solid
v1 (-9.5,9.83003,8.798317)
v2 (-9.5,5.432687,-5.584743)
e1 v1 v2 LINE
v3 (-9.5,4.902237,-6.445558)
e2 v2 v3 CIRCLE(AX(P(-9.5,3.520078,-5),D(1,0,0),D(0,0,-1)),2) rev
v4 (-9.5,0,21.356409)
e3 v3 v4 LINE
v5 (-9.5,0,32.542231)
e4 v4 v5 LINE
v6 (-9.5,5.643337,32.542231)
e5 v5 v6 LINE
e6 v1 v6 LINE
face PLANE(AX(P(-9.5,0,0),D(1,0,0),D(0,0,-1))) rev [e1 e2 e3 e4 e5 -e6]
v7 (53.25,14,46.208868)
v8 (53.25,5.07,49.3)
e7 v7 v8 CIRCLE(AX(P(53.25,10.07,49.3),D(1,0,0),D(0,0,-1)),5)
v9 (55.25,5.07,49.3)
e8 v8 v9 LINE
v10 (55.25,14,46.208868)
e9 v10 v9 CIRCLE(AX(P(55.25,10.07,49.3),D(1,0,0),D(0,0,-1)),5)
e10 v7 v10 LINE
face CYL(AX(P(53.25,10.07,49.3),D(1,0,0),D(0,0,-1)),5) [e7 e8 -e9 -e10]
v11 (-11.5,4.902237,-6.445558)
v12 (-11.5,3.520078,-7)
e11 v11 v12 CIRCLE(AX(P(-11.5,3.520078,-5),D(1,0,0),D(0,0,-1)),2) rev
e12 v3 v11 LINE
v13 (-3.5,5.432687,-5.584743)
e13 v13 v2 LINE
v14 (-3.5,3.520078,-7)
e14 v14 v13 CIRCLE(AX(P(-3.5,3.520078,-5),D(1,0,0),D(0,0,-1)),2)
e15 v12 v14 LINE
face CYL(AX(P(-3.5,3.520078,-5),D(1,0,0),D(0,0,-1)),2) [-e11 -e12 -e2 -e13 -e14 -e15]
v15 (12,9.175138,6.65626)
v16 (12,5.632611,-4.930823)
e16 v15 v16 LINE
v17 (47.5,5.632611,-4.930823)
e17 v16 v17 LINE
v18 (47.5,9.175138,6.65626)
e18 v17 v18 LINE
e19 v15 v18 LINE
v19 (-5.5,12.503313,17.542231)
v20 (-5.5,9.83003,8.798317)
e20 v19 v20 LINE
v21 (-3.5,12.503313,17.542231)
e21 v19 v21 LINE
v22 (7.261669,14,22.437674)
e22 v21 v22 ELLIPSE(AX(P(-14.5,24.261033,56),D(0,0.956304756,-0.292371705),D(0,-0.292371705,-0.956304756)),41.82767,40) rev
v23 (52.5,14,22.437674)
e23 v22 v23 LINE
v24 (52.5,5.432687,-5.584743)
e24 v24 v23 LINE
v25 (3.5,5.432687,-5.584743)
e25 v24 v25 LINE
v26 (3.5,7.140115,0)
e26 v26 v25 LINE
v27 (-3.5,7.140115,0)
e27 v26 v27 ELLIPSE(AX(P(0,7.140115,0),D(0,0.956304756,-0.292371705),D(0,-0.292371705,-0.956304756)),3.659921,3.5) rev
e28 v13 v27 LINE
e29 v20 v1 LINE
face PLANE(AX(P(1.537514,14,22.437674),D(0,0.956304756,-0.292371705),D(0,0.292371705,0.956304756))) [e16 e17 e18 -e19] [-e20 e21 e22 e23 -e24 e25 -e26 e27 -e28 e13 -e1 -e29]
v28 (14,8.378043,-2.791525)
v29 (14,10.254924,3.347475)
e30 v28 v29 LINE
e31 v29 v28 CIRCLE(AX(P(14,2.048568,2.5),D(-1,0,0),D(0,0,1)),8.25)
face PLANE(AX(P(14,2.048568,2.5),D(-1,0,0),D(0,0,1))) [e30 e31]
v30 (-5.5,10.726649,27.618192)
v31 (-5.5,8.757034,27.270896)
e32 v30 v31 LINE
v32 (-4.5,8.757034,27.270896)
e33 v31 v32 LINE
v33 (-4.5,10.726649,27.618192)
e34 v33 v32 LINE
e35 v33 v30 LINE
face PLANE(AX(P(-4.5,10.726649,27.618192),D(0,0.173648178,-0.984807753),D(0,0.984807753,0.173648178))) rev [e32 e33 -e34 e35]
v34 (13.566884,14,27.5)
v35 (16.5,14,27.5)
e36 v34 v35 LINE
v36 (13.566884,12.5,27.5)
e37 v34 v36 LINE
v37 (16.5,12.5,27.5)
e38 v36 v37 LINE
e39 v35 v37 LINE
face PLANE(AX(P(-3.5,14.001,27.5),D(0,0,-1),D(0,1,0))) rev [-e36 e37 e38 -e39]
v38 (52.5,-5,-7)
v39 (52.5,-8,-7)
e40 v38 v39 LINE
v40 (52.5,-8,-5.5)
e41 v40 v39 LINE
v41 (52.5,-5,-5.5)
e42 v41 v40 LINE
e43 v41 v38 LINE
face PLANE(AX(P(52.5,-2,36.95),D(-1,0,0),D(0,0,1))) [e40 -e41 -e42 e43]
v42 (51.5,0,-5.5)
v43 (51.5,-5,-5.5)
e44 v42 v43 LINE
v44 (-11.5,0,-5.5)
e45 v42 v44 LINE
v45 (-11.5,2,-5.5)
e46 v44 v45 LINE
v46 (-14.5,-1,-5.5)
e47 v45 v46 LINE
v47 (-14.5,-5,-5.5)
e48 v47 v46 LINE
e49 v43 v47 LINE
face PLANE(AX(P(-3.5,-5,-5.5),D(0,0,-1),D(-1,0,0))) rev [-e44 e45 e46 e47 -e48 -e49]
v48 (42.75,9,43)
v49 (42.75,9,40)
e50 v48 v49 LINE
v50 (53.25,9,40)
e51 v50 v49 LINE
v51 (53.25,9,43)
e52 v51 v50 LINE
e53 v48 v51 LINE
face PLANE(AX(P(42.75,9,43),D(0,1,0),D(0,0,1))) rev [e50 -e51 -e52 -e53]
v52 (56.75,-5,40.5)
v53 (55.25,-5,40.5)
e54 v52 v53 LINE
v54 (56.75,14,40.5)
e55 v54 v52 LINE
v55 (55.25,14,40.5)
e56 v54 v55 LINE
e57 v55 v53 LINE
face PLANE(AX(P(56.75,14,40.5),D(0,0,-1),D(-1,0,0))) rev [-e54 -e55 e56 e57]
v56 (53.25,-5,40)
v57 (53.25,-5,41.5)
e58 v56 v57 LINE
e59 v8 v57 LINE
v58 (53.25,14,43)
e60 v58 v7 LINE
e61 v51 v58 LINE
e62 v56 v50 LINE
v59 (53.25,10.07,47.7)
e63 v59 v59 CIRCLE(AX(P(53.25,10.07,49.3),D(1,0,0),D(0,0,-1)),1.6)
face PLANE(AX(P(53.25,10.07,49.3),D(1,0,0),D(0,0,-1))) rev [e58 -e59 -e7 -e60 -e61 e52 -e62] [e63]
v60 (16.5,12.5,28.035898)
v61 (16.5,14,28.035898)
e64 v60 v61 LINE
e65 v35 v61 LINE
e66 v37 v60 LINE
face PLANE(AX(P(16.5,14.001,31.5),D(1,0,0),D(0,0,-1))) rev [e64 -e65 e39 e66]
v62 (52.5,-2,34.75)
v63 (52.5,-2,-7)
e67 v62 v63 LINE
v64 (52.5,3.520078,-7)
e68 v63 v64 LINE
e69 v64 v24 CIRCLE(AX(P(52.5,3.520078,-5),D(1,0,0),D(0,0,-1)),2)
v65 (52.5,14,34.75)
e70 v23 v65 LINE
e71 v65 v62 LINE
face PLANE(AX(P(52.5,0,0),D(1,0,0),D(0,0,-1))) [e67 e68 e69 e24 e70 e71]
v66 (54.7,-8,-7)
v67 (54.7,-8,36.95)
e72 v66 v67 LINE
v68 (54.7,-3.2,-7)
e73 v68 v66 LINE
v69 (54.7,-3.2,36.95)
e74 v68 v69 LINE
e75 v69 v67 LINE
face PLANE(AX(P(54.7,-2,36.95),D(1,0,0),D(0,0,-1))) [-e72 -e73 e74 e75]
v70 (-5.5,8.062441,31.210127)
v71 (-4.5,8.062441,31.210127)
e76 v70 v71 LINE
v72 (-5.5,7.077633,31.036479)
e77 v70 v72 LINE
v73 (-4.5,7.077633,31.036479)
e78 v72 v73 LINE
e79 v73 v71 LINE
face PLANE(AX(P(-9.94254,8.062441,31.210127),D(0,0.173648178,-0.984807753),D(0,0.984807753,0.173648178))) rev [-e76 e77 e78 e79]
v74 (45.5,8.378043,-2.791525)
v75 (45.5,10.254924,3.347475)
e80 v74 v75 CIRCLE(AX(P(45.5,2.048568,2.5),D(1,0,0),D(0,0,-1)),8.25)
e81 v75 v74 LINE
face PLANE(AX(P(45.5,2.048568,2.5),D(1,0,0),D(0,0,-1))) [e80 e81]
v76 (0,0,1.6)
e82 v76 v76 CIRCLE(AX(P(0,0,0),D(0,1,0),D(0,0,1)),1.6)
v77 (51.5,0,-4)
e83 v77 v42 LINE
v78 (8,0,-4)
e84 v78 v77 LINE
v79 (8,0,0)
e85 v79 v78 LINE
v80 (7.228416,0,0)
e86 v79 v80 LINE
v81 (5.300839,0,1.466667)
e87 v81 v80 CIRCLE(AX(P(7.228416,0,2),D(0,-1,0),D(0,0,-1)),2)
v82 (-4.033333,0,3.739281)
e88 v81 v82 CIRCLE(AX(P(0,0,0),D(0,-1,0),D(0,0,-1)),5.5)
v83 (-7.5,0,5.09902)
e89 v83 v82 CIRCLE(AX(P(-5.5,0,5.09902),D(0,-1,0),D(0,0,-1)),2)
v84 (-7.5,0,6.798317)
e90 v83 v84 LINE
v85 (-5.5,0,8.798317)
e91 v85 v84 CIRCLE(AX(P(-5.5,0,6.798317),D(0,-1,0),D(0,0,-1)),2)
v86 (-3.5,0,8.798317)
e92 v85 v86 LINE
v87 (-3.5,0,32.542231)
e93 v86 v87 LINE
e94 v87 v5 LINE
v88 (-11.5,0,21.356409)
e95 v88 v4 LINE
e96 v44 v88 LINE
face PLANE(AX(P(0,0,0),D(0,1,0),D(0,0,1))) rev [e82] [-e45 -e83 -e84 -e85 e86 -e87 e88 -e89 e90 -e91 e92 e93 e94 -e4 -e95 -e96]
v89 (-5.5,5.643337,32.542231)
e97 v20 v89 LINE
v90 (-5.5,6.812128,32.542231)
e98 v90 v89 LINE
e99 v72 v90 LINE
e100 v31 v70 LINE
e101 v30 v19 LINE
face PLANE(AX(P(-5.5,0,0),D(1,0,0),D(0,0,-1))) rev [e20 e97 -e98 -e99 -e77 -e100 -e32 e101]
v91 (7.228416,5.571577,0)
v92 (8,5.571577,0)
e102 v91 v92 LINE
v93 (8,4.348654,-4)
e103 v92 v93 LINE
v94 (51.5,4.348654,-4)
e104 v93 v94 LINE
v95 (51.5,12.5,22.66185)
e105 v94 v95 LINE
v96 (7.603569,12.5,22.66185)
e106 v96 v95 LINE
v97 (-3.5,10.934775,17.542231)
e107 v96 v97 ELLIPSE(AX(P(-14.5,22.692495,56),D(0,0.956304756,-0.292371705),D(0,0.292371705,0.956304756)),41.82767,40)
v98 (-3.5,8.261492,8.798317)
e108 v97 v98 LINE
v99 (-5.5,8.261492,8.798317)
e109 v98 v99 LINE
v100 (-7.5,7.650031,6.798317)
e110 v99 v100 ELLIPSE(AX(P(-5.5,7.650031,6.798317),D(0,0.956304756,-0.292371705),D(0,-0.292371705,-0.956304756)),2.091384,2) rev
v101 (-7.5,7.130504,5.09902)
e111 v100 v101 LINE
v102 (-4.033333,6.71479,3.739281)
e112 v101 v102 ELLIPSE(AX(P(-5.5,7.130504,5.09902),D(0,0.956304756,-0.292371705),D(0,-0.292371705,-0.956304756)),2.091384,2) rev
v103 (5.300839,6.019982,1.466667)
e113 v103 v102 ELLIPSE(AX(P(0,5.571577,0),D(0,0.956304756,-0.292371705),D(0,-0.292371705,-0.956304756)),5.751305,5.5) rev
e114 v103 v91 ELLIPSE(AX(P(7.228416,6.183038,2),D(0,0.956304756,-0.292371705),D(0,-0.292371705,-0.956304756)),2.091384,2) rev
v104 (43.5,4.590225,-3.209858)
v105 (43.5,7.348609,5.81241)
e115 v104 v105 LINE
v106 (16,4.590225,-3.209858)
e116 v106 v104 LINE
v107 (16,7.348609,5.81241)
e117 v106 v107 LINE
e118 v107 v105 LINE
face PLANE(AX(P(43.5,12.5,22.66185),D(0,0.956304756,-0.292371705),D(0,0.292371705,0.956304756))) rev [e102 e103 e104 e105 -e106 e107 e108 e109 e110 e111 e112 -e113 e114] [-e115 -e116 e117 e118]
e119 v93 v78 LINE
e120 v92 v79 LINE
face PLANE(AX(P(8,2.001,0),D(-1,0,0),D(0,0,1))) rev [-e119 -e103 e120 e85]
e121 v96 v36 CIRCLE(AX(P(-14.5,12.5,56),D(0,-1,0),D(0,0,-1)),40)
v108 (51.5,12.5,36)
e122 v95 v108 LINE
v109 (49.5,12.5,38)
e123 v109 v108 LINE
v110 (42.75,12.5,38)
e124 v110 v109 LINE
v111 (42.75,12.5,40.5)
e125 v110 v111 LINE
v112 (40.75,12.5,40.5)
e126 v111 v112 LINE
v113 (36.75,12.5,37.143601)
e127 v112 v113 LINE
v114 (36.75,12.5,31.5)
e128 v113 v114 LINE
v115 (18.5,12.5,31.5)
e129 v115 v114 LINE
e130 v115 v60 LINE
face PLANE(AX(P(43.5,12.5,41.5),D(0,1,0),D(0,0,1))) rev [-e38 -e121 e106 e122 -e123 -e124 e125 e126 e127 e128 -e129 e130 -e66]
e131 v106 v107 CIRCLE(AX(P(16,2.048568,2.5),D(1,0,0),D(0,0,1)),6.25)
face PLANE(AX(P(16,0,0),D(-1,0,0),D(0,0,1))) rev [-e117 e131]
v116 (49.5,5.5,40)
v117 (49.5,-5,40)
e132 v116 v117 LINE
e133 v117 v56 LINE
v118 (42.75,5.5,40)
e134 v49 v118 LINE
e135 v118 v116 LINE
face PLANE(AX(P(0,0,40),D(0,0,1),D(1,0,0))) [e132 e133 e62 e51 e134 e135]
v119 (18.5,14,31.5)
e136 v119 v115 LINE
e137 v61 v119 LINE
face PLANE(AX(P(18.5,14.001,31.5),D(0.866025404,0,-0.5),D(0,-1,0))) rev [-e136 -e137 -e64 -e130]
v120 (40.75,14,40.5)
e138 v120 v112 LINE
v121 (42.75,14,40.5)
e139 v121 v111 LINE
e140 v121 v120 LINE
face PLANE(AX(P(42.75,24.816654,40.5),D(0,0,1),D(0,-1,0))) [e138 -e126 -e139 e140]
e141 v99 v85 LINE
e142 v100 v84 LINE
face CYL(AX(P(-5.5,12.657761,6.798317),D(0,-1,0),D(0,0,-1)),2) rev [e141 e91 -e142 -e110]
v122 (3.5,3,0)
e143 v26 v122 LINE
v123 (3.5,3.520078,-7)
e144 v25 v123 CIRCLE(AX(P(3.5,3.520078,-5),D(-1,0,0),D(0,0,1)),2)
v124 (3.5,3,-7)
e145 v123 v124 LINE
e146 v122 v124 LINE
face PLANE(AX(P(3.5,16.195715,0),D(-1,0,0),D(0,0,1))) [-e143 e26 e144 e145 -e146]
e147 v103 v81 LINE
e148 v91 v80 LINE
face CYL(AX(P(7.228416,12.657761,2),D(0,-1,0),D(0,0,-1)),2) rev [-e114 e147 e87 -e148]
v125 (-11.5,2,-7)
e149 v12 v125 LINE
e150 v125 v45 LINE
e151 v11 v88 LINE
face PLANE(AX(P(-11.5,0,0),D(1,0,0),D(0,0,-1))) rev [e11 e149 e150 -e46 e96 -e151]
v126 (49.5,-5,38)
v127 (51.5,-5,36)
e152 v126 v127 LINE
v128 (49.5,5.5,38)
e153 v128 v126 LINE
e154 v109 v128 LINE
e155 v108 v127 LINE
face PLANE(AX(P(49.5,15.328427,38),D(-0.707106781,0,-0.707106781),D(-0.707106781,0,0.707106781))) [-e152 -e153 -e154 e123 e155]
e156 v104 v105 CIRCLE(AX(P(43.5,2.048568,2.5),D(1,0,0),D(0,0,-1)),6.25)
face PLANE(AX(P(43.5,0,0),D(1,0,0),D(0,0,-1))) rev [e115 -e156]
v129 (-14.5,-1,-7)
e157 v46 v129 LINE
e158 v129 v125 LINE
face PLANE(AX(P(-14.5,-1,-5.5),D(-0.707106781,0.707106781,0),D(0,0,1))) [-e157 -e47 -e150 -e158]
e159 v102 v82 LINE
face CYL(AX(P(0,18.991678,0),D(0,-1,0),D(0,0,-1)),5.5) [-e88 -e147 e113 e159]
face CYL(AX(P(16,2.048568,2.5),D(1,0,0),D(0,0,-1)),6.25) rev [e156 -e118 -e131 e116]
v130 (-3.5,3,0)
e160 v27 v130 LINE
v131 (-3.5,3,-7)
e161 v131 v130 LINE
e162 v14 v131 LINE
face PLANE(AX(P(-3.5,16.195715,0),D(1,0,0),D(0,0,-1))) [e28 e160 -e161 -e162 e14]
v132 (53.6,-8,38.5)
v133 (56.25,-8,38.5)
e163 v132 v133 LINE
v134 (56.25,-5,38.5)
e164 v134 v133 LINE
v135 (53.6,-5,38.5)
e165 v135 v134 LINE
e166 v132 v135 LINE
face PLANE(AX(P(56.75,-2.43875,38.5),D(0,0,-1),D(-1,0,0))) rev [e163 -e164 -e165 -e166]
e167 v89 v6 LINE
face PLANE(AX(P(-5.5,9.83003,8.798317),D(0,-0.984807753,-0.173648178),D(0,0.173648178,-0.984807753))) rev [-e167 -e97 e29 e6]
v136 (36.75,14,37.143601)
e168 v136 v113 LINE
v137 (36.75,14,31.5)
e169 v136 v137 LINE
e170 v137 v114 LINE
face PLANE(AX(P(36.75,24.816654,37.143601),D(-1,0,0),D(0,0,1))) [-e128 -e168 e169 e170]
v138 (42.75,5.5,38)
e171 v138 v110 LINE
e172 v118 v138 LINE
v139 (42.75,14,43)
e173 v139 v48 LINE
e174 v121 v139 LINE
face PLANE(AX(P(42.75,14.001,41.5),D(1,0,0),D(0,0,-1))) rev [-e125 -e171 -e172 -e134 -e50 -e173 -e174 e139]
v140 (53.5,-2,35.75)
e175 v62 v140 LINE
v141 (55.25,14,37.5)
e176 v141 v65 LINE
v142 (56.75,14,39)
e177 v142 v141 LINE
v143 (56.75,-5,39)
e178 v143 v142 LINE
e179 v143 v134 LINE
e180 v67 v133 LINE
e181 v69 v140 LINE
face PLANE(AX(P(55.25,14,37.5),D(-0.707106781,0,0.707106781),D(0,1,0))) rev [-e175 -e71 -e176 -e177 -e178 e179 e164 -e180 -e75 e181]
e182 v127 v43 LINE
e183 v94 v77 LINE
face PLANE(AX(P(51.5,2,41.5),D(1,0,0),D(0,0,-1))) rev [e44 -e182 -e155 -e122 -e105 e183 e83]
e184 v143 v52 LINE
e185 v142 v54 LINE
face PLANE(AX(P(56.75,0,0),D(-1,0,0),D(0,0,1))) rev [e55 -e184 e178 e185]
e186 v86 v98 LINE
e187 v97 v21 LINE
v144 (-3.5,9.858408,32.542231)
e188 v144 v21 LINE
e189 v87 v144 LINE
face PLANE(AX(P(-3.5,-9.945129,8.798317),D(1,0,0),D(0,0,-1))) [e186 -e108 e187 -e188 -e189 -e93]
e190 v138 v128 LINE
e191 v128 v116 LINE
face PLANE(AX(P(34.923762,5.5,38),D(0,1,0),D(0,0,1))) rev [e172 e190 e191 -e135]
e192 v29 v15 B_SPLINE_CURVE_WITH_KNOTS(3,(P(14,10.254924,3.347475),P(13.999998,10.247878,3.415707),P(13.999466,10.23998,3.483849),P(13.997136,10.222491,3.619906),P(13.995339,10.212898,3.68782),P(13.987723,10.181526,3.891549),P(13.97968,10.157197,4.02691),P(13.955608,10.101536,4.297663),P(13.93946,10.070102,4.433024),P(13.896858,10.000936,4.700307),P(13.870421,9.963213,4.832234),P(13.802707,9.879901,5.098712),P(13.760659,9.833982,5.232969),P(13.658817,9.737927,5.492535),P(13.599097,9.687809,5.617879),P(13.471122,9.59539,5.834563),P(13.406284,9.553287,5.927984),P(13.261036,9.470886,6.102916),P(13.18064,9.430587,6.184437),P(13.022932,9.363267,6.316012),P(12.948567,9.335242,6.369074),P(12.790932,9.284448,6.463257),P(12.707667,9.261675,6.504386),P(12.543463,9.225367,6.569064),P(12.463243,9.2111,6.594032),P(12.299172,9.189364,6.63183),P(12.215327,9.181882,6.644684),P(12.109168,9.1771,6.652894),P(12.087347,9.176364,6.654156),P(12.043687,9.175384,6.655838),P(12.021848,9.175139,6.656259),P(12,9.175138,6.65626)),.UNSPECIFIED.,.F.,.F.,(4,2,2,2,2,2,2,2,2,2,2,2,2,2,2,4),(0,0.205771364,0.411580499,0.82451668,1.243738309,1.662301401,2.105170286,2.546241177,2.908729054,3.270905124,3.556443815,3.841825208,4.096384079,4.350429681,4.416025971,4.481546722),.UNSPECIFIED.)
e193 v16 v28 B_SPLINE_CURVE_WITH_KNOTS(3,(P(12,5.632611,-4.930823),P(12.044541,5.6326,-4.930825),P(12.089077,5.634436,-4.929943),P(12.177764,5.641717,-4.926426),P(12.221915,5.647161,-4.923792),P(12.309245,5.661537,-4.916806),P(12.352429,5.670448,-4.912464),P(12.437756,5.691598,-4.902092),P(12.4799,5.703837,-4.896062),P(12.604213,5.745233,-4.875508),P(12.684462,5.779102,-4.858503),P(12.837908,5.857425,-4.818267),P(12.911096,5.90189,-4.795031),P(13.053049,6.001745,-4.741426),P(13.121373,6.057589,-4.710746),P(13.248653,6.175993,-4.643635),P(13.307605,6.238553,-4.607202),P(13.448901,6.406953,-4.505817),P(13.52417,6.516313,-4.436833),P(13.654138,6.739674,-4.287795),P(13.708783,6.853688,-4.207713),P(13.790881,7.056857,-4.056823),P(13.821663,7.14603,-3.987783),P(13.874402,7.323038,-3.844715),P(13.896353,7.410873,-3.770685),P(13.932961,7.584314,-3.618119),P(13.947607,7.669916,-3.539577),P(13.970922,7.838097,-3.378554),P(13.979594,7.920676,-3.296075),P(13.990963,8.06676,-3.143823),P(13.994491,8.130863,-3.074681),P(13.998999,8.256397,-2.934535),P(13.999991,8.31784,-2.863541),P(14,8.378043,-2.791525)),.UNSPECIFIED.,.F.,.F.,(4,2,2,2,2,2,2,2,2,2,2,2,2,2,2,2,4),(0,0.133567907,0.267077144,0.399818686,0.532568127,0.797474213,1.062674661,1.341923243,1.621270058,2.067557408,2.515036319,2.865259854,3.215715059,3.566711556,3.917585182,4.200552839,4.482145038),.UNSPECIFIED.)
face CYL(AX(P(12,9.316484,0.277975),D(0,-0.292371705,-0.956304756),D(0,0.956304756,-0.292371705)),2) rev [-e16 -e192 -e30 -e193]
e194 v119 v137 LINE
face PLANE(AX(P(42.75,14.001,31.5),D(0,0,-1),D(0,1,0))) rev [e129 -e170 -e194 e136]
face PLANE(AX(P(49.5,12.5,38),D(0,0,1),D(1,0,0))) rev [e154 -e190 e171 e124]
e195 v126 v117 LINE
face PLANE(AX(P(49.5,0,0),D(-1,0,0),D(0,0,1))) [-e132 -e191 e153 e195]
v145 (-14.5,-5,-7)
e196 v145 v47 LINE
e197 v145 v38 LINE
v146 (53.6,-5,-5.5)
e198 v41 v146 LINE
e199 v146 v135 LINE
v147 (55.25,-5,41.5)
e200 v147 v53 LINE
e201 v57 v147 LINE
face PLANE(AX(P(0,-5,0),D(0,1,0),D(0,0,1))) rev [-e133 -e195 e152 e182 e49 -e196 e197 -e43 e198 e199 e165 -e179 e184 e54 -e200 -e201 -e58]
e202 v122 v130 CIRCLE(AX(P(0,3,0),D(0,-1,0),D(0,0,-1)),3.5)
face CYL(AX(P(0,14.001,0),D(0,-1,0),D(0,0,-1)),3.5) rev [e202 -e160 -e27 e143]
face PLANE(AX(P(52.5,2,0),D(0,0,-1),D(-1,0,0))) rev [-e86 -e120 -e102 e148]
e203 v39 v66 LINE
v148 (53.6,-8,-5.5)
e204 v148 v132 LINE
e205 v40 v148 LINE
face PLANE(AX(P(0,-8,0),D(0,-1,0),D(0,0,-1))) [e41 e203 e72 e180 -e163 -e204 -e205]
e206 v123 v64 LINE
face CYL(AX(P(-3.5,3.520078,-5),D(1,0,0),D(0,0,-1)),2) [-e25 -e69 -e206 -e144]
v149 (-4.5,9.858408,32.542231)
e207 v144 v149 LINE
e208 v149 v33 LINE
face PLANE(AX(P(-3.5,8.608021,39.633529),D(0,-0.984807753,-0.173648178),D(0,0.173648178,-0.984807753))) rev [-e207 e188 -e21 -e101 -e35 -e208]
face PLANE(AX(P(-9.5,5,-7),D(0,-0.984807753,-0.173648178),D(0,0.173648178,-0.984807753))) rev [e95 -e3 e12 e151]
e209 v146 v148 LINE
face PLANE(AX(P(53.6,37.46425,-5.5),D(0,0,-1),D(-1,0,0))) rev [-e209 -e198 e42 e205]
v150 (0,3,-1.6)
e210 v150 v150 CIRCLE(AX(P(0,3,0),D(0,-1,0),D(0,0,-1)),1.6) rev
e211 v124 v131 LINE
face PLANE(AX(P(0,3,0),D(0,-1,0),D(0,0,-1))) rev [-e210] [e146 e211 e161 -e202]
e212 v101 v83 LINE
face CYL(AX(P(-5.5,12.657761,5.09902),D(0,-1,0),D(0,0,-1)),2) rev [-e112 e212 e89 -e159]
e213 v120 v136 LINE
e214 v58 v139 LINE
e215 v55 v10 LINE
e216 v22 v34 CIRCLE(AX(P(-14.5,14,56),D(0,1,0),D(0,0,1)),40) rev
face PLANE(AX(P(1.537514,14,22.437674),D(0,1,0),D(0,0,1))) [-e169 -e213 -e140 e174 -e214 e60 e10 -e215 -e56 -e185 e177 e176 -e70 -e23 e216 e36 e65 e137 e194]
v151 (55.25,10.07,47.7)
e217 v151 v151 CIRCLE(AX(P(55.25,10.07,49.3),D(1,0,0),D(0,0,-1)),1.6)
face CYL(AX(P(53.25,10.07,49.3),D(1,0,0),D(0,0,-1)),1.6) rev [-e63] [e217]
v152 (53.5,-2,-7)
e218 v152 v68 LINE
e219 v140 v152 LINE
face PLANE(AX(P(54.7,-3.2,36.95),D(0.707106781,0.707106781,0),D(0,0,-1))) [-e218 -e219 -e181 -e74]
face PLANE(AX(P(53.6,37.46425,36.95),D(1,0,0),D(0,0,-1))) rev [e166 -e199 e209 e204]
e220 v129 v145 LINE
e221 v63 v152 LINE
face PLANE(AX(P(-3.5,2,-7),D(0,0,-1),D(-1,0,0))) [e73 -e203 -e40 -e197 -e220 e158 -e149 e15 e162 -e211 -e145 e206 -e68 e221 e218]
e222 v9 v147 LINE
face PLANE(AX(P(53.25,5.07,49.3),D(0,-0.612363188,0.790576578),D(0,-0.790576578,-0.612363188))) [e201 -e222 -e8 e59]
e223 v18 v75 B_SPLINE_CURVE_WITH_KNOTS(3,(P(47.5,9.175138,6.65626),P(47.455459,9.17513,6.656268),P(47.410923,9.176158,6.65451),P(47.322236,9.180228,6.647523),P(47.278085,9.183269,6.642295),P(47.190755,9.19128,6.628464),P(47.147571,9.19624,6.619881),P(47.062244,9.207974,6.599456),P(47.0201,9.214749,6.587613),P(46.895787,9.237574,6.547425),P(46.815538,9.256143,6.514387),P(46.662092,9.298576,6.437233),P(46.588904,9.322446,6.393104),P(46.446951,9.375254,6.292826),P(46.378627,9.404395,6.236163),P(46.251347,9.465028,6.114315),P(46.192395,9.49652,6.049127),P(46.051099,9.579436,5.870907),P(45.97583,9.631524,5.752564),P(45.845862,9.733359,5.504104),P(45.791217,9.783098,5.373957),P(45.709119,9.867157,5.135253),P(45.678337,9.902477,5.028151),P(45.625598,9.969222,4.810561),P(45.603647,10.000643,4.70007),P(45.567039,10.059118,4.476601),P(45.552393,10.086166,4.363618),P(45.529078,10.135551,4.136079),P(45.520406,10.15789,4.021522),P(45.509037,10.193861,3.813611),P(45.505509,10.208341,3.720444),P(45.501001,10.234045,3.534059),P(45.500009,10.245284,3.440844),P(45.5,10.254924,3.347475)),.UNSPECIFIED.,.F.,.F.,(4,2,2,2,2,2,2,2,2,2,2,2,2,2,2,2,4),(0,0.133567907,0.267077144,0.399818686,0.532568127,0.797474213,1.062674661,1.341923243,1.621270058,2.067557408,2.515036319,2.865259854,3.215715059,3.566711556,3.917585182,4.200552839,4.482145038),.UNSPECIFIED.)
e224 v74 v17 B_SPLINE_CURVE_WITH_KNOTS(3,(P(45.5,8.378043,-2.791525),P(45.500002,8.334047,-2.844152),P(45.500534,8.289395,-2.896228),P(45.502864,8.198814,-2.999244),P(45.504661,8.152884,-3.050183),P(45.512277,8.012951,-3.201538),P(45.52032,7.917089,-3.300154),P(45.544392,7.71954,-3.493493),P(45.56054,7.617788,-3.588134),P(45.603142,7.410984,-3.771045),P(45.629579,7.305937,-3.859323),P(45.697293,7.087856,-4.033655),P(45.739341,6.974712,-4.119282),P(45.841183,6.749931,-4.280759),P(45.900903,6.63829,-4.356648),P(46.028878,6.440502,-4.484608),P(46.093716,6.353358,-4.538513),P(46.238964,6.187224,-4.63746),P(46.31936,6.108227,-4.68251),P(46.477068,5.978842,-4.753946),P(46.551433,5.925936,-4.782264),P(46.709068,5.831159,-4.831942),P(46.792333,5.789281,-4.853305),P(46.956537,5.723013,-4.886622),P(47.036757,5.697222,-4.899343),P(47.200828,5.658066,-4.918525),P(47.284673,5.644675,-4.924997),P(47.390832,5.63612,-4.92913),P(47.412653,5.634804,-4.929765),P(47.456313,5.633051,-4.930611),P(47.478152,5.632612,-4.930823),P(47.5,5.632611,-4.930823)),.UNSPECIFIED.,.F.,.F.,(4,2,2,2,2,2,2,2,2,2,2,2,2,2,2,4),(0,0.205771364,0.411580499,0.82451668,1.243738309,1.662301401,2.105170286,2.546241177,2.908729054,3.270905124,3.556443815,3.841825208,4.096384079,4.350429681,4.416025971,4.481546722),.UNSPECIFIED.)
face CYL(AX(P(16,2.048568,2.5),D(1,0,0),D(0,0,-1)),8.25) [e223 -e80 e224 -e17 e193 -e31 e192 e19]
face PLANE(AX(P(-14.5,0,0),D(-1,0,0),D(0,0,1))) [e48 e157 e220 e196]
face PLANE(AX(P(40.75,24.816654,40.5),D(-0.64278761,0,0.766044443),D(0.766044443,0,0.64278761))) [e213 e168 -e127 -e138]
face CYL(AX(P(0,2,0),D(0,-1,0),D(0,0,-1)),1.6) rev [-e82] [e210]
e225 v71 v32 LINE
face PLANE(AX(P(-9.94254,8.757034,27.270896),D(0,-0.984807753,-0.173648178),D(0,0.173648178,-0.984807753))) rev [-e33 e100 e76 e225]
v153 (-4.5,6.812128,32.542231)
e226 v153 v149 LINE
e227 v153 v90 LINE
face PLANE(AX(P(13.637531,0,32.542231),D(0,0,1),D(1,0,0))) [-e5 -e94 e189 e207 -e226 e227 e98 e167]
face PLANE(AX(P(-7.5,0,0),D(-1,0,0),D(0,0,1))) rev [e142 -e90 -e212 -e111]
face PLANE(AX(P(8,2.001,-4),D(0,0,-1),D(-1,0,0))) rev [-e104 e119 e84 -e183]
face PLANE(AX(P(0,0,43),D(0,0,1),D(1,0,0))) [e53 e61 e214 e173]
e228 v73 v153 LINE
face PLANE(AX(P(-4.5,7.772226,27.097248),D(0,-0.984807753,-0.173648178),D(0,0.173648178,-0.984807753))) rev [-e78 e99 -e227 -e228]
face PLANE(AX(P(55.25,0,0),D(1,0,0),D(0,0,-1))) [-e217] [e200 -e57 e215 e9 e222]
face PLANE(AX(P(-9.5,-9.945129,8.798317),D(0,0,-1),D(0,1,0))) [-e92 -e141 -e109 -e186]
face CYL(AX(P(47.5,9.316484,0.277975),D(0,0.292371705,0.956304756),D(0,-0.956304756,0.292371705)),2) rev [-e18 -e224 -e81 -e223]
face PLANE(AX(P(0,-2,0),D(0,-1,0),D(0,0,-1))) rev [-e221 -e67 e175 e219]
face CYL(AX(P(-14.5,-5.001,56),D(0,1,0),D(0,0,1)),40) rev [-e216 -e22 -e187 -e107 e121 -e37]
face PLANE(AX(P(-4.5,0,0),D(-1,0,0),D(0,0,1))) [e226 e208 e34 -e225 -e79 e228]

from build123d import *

# Parameters (mm, degrees)
SKETCH_1_R                      = 3.5
SKETCH_1_R_2                    = 1.6
EXTRUDE_1_DEPTH                 = 2
EXTRUDE_2_DEPTH                 = 2
SKETCH_3_W                      = 7
SKETCH_3_H                      = 1.5
EXTRUDE_3_DEPTH                 = 5
EXTRUDE_4_DEPTH                 = 49
CUT_EXTRUDE_1_REACH             = 55.2
SKETCH_5_W                      = 44.5
SKETCH_5_H                      = 4
SKETCH_6_W                      = 1
SKETCH_6_H                      = 7
EXTRUDE_5_DEPTH                 = 47
EXTRUDE_6_DEPTH                 = 1
EXTRUDE_7_DEPTH                 = 8
EXTRUDE_8_DEPTH                 = 27.5
EXTRUDE_START                   = 2
EXTRUDE_9_DEPTH                 = 2
CUT_EXTRUDE_2_REACH             = 71.172
SKETCH_11_W                     = 26.75
SKETCH_11_H                     = 10
EXTRUDE_10_DEPTH                = 19.5
EXTRUDE_11_DEPTH                = 2
EXTRUDE_12_REACH                = 69.989
CUT_EXTRUDE_3_REACH             = 69.989
SKETCH_15_R                     = 1.6
CUT_EXTRUDE_4_REACH             = 71.172
SKETCH_16_W                     = 20
SKETCH_16_H                     = 4
CUT_EXTRUDE_5_REACH             = 71.172
CUT_EXTRUDE_5_DIRECTION_2_REACH = 71.172
CHAMFER_1_SIZE                  = 2
CHAMFER_1_SIZE2                 = 3.464101615
EXTRUDE_13_DEPTH                = 1.5
SKETCH_19_W                     = 3.5
SKETCH_19_H                     = 17.5
EXTRUDE_14_DEPTH                = 2
SKETCH_20_W                     = 3.5
SKETCH_20_H                     = 7
EXTRUDE_15_DEPTH                = 6.75
EXTRUDE_16_DEPTH                = 8
SKETCH_22_W                     = 1.5
SKETCH_22_H                     = 4
EXTRUDE_17_DEPTH                = 3
CHAMFER_2_SIZE                  = 3
CUT_EXTRUDE_6_DEPTH             = 5.5
CUT_EXTRUDE_7_DEPTH             = 2
EXTRUDE_18_DEPTH                = 2
CUT_EXTRUDE_8_DEPTH             = 4
EXTRUDE_19_REACH                = 70.736
SKETCH_27_W                     = 6
SKETCH_27_H                     = 8.878803279
EXTRUDE_20_DEPTH                = 2
EXTRUDE_21_DEPTH                = 6
SKETCH_31_W                     = 2
SKETCH_31_H                     = 6.859975599
EXTRUDE_22_DEPTH                = 15.231399178
CUT_EXTRUDE_9_DEPTH             = 1
EXTRUDE_23_DEPTH                = 1
CUT_EXTRUDE_10_REACH            = 69.82
SKETCH_35_R                     = 3.5
EXTRUDE_24_REACH                = 70.37
EXTRUDE_25_REACH                = 70.37
SKETCH_38_W                     = 4
SKETCH_38_H                     = 19
EXTRUDE_26_DEPTH                = 2.75
SKETCH_39_R                     = 1.6
EXTRUDE_27_DEPTH                = 2
SKETCH_40_W                     = 10.5
SKETCH_40_H                     = 5
EXTRUDE_28_DEPTH                = 1.5
CHAMFER_3_SIZE                  = 2.75
CUT_EXTRUDE_11_REACH            = 80.401
SKETCH_41_W                     = 7
SKETCH_41_H                     = 7
FILLET_2_R                      = 2
EXTRUDE_START_2                 = -17.5
EXTRUDE_29_DEPTH                = 17.5
SKETCH_43_W                     = 3
SKETCH_43_H                     = 19
EXTRUDE_30_DEPTH                = 1.5
CHAMFER_4_SIZE                  = 1.5
EXTRUDE_31_DEPTH                = 2
FILLET_3_R                      = 2
CUT_EXTRUDE_12_DEPTH            = 1.5
EXTRUDE_32_DEPTH                = 3
EXTRUDE_32_DEPTH_BACK           = 3
SKETCH_47_W                     = 2.2
SKETCH_47_H                     = 43.95
CHAMFER_5_SIZE                  = 1.2
SKETCH_48_W                     = 1.1
SKETCH_48_H                     = 42.45
CUT_EXTRUDE_13_DEPTH            = 3
EXTRUDE_33_DEPTH                = 3
SKETCH_50_W                     = 1.6
SKETCH_50_H                     = 2
CUT_EXTRUDE_14_DEPTH            = 3
EXTRUDE_34_DEPTH                = 3


# Some blends are built 0.0001 mm under size
with BuildPart() as part:
    # 草图1 → 凸台-拉伸1 (new body)
    with BuildSketch(Plane(origin=(0, 0, 0), x_dir=(1, 0, 0), z_dir=(0, 1, 0))):
        with Locations(Location((0, 0, 0), (0, 0, 270))):
            Circle(SKETCH_1_R)
        with Locations(Location((0, 0, 0), (0, 0, 270))):
            Circle(SKETCH_1_R_2, mode=Mode.SUBTRACT)
    extrude(amount=EXTRUDE_1_DEPTH)

    # 草图2 → 凸台-拉伸2 (add)
    with BuildSketch(Plane.XZ):
        with BuildLine():
            Line((-3.5, 0), (-3.5, -7))
            Line((-3.5, -7), (3.5, -7))
            Line((3.5, -7), (3.5, 0))
            ThreePointArc((3.5, 0), (0, -3.5), (-3.5, 0))
        make_face()
    extrude(amount=-EXTRUDE_2_DEPTH)

    # 草图3 → 凸台-拉伸3 (add)
    with BuildSketch(Plane.XZ):
        with Locations((0, -6.25)):
            Rectangle(SKETCH_3_W, SKETCH_3_H)
    extrude(amount=EXTRUDE_3_DEPTH)

    # 草图4 → 凸台-拉伸4 (add)
    with BuildSketch(Plane(origin=(3.5, 0, 0), x_dir=(0, 0, -1), z_dir=(1, 0, 0))):
        Polygon((0, 0), (5.5, 0), (5.5, -5), (7, -5), (7, 2), (0, 2), align=None)
    extrude(amount=EXTRUDE_4_DEPTH)

    # 草图5 → 切除-拉伸1 (cut, up to next)
    with BuildSketch(Plane.XZ, mode=Mode.PRIVATE) as cut_extrude_1_sk1:
        with Locations((30.25, -2)):
            Rectangle(SKETCH_5_W, SKETCH_5_H)
    cut_extrude_1_tool1 = extrude(cut_extrude_1_sk1.sketch, amount=-CUT_EXTRUDE_1_REACH, mode=Mode.PRIVATE) & part.part
    add(cut_extrude_1_tool1.solids().sort_by_distance((30.25, 0, -2))[0], mode=Mode.SUBTRACT)

    # 草图6 → 凸台-拉伸5 (add)
    with BuildSketch(Plane.XY.offset(-5.5)):
        with Locations((52, -1.5)):
            Rectangle(SKETCH_6_W, SKETCH_6_H)
    extrude(amount=EXTRUDE_5_DEPTH)

    # 草图7 → 凸台-拉伸6 (add)
    with BuildSketch(Plane(origin=(52.5, 0, 0), x_dir=(0, 0, -1), z_dir=(1, 0, 0))):
        Polygon((-22.437673566, 14), (7, 5), (7, 2), (-41.5, 2), (-41.5, 14), align=None)
    extrude(amount=-EXTRUDE_6_DEPTH)

    # 草图8 → 凸台-拉伸7 (add)
    with BuildSketch(Plane.ZY.offset(-51.5)):
        Polygon((-7, 2), (-7, 5), (22.437673566, 14), (41.5, 14), (41.5, 12.5), (22.661850068, 12.5), (-4, 4.34865441), (-4, 2), align=None)
    extrude(amount=EXTRUDE_7_DEPTH)

    # 草图9 → 凸台-拉伸8 (add)
    with BuildSketch(Plane.ZY.offset(-43.5)):
        with BuildLine():
            Line((5.812409936, 7.348609186), (22.661850068, 12.5))
            Line((22.661850068, 12.5), (41.5, 12.5))
            Line((41.5, 12.5), (41.5, 14))
            Line((41.5, 14), (22.437673566, 14))
            Line((22.437673566, 14), (6.656260181, 9.175137731))
            ThreePointArc((6.656260181, 9.175137731), (0.087933436, 9.938081874), (-4.930823274, 5.63261081))
            Line((-4.930823274, 5.63261081), (-7, 5))
            Line((-7, 5), (-7, 2))
            Line((-7, 2), (-4, 2))
            Line((-4, 2), (-4, 4.34865441))
            Line((-4, 4.34865441), (-3.209857915, 4.590225088))
            ThreePointArc((-3.209857915, 4.590225088), (0.672676845, 8.025472362), (5.812409936, 7.348609186))
        make_face()
    extrude(amount=EXTRUDE_8_DEPTH)

    # 草图10 → 凸台-拉伸9 (add)
    with BuildSketch(Plane(origin=(43.5, 0, 0), x_dir=(0, 0, -1), z_dir=(1, 0, 0)).offset(EXTRUDE_START)):
        with BuildLine():
            Line((-6.656260181, 9.175137731), (4.930823274, 5.63261081))
            ThreePointArc((4.930823274, 5.63261081), (-0.087933436, 9.938081874), (-6.656260181, 9.175137731))
        make_face()
    extrude(amount=-EXTRUDE_9_DEPTH)

    # 草图11 → 切除-拉伸2 (cut, up to next)
    with BuildSketch(Plane.XZ.offset(-12.5), mode=Mode.PRIVATE) as cut_extrude_2_sk1:
        with Locations((29.375, 36.5)):
            Rectangle(SKETCH_11_W, SKETCH_11_H)
    cut_extrude_2_tool1 = extrude(cut_extrude_2_sk1.sketch, amount=-CUT_EXTRUDE_2_REACH, mode=Mode.PRIVATE) & part.part
    add(cut_extrude_2_tool1.solids().sort_by_distance((29.375, 12.5, 36.5))[0], mode=Mode.SUBTRACT)

    # 草图12 → 凸台-拉伸10 (add)
    with BuildSketch(Plane.ZY.offset(-16)):
        Polygon((-7, 2), (-4, 2), (-4, 4.34865441), (22.661850068, 12.5), (31.5, 12.5), (31.5, 14), (22.437673566, 14), (-7, 5), align=None)
    extrude(amount=EXTRUDE_10_DEPTH)

    # 草图13 → 凸台-拉伸11 (add)
    with BuildSketch(Plane.ZY.offset(-16)):
        with BuildLine():
            Line((-4.930823274, 5.63261081), (6.656260181, 9.175137731))
            ThreePointArc((6.656260181, 9.175137731), (0.087933436, 9.938081874), (-4.930823274, 5.63261081))
        make_face()
    extrude(amount=EXTRUDE_11_DEPTH)

    # 凸台-拉伸12: up to this plane
    extrude_12_end = Plane(origin=(43.5, 12.5, 22.661850068), z_dir=(0, 0.9563047559630374, -0.29237170472273066))
    # 草图14 → 凸台-拉伸12 (add, up to the surface)
    with BuildSketch(Plane(origin=(0, 2, 0), x_dir=(1, 0, 0), z_dir=(0, 1, 0)), mode=Mode.PRIVATE) as extrude_12_sk1:
        with BuildLine():
            Line((8, 0), (8, 4))
            Line((8, 4), (-3.5, 4))
            Line((-3.5, 4), (-3.5, 0))
            ThreePointArc((-3.5, 0), (0, -3.5), (3.5, 0))
            Line((3.5, 0), (8, 0))
        make_face()
    extrude_12_tool1 = split(extrude(extrude_12_sk1.sketch, amount=EXTRUDE_12_REACH, mode=Mode.PRIVATE), bisect_by=extrude_12_end, keep=Keep.BOTH, mode=Mode.PRIVATE)
    add(extrude_12_tool1.solids().sort_by_distance((1.586395, 2, -0.972018))[0])

    # 草图15 → 切除-拉伸3 (cut, up to next)
    with BuildSketch(Plane.XZ.offset(-2), mode=Mode.PRIVATE) as cut_extrude_3_sk1:
        with Locations(Location((0, 0, 0), (0, 0, 270))):
            Circle(SKETCH_15_R)
    cut_extrude_3_tool1 = extrude(cut_extrude_3_sk1.sketch, amount=-CUT_EXTRUDE_3_REACH, mode=Mode.PRIVATE) & part.part
    add(cut_extrude_3_tool1.solids().sort_by_distance((0, 2, 0))[0], mode=Mode.SUBTRACT)

    # 草图16 → 切除-拉伸4 (cut, up to next)
    with BuildSketch(Plane.XZ.offset(-12.5), mode=Mode.PRIVATE) as cut_extrude_4_sk1:
        with Locations((6.5, 29.5)):
            Rectangle(SKETCH_16_W, SKETCH_16_H)
    cut_extrude_4_tool1 = extrude(cut_extrude_4_sk1.sketch, amount=-CUT_EXTRUDE_4_REACH, mode=Mode.PRIVATE) & part.part
    add(cut_extrude_4_tool1.solids().sort_by_distance((6.5, 12.5, 29.5))[0], mode=Mode.SUBTRACT)

    # 草图17 → 切除-拉伸5 (cut, up to next)
    with BuildSketch(Plane.XZ.offset(-12.5), mode=Mode.PRIVATE) as cut_extrude_5_sk1:
        with BuildLine():
            Line((13.566884401, 27.5), (-3.5, 27.5))
            Line((-3.5, 27.5), (-3.5, 17.542230954))
            ThreePointArc((-3.5, 17.542230954), (5.657992343, 21.450682428), (13.566884401, 27.5))
        make_face()
    cut_extrude_5_tool1 = extrude(cut_extrude_5_sk1.sketch, amount=-CUT_EXTRUDE_5_REACH, mode=Mode.PRIVATE) & part.part
    add(cut_extrude_5_tool1.solids().sort_by_distance((2.689005, 12.5, 23.843296))[0], mode=Mode.SUBTRACT)

    # 草图17 → 切除-拉伸5 direction 2 (cut, up to next)
    with BuildSketch(Plane.XZ.offset(-12.5), mode=Mode.PRIVATE) as cut_extrude_5_direction_2_sk1:
        with BuildLine():
            Line((13.566884401, 27.5), (-3.5, 27.5))
            Line((-3.5, 27.5), (-3.5, 17.542230954))
            ThreePointArc((-3.5, 17.542230954), (5.657992343, 21.450682428), (13.566884401, 27.5))
        make_face()
    cut_extrude_5_direction_2_tool1 = extrude(cut_extrude_5_direction_2_sk1.sketch, amount=CUT_EXTRUDE_5_DIRECTION_2_REACH, mode=Mode.PRIVATE) & part.part
    add(cut_extrude_5_direction_2_tool1.solids().sort_by_distance((2.689005, 12.5, 23.843296))[0], mode=Mode.SUBTRACT)

    # 倒角1
    chamfer_1_edges = [part.edges().sort_by_distance(p)[0] for p in [
        (16.5, 13.25, 31.5),
    ]]
    chamfer_1_side = [part.faces().sort_by_distance(p)[0] for p in [
        (29.625, 13.25, 31.5),
    ]]
    chamfer(chamfer_1_edges, length=CHAMFER_1_SIZE, length2=CHAMFER_1_SIZE2, reference=chamfer_1_side[0])

    # 草图18 → 凸台-拉伸13 (add)
    with BuildSketch(Plane.XZ.offset(-12.5)):
        Polygon((42.75, 40.5), (40.75, 40.5), (36.75, 37.143601475), (36.75, 31.5), (42.75, 31.5), align=None)
    extrude(amount=-EXTRUDE_13_DEPTH)

    # 草图19 → 凸台-拉伸14 (add)
    with BuildSketch(Plane.ZY.offset(-51.5)):
        with Locations((39.75, 3.75)):
            Rectangle(SKETCH_19_W, SKETCH_19_H)
    extrude(amount=EXTRUDE_14_DEPTH)

    # 草图20 → 凸台-拉伸15 (add)
    with BuildSketch(Plane.ZY.offset(-49.5)):
        with Locations((39.75, 9)):
            Rectangle(SKETCH_20_W, SKETCH_20_H)
    extrude(amount=EXTRUDE_15_DEPTH)

    # 草图21 → 凸台-拉伸16 (add)
    with BuildSketch(Plane.ZY.offset(3.5)):
        Polygon((0, 5.571577135), (17.542230954, 10.934775359), (17.542230954, 12.503312994), (-7, 5), (-7, -5), (-5.5, -5), (-5.5, 0), (0, 0), align=None)
    extrude(amount=EXTRUDE_16_DEPTH)

    # 草图22 → 凸台-拉伸17 (add)
    with BuildSketch(Plane.ZY.offset(11.5)):
        with Locations((-6.25, -3)):
            Rectangle(SKETCH_22_W, SKETCH_22_H)
    extrude(amount=EXTRUDE_17_DEPTH)

    # 倒角2
    chamfer_2_edges = [part.edges().sort_by_distance(p)[0] for p in [
        (-11.5, -1, -6.25),
    ]]
    chamfer(chamfer_2_edges, length=CHAMFER_2_SIZE - 0.0001)  # a hair under: the kernel refuses the full size

    # 草图23 → 切除-拉伸6 (cut)
    with BuildSketch(Plane.XY):
        Polygon((-11.5, 2), (-11.5, 0), (-13.5, 0), align=None)
    extrude(amount=-CUT_EXTRUDE_6_DEPTH, mode=Mode.SUBTRACT)

    # 草图24 → 切除-拉伸7 (cut)
    with BuildSketch(Plane.ZY.offset(11.5)):
        Polygon((-7, 5), (17.542230954, 0.672542516), (17.542230954, 12.503312994), align=None)
    extrude(amount=-CUT_EXTRUDE_7_DEPTH, mode=Mode.SUBTRACT)

    # 草图25 → 凸台-拉伸18 (add)
    with BuildSketch(Plane.ZY.offset(9.5)):
        Polygon((0, 5.571577135), (0, 0), (17.542230954, 0), (17.542230954, 10.934775359), align=None)
    extrude(amount=-EXTRUDE_18_DEPTH)

    # 草图26 → 切除-拉伸8 (cut)
    with BuildSketch(Plane.ZY.offset(9.5)):
        Polygon((8.798316647, 9.830030114), (17.542230954, 8.288242105), (17.542230954, 12.503312994), align=None)
    extrude(amount=-CUT_EXTRUDE_8_DEPTH, mode=Mode.SUBTRACT)

    # 凸台-拉伸19: up to this plane
    extrude_19_end = Plane(origin=(0, 0, 0), z_dir=(0, 1, 0))
    # 草图27 → 凸台-拉伸19 (add, up to the surface)
    with BuildSketch(Plane(origin=(0, 11.038219198, 1.946335864), x_dir=(1, 0, 0), z_dir=(0, 0.9848077530122081, 0.1736481776669299)), mode=Mode.PRIVATE) as extrude_19_sk1:
        with Locations((-6.5, -11.397085271)):
            Rectangle(SKETCH_27_W, SKETCH_27_H)
    extrude_19_tool1 = split(extrude(extrude_19_sk1.sketch, amount=EXTRUDE_19_REACH, dir=(0, -1, 0), mode=Mode.PRIVATE), bisect_by=extrude_19_end, keep=Keep.BOTH, mode=Mode.PRIVATE)
    add(extrude_19_tool1.solids().sort_by_distance((-6.5, 9.059136, 13.170274))[0])

    # 草图28 → 凸台-拉伸20 (add)
    with BuildSketch(Plane.ZY.offset(5.5)):
        Polygon((17.542230954, 12.503312994), (17.542230954, 8.288242105), (8.798316647, 9.830030114), align=None)
    extrude(amount=-EXTRUDE_20_DEPTH)

    # 草图30 → 凸台-拉伸21 (add)
    with BuildSketch(Plane.ZY.offset(9.5)):
        Polygon((17.542230954, 0), (32.542230954, 0), (32.542230954, 5.643337395), (17.542230954, 8.288242105), align=None)
    extrude(amount=-EXTRUDE_21_DEPTH)

    # 草图31 → 凸台-拉伸22 (add, along a direction that is not the sketch's normal)
    with BuildSketch(Plane.XY.offset(17.542230954)):
        with Locations((-4.5, 9.073325195)):
            Rectangle(SKETCH_31_W, SKETCH_31_H)
    extrude(amount=EXTRUDE_22_DEPTH, dir=(0, -0.17364817766692983, 0.9848077530122081))

    # 草图32 → 切除-拉伸9 (cut)
    with BuildSketch(Plane.ZY.offset(5.5)):
        Polygon((27.618192189, 10.726649172), (27.097247656, 7.772225913), (32.542230954, 6.812128448), (32.542230954, 9.858408283), align=None)
    extrude(amount=-CUT_EXTRUDE_9_DEPTH, mode=Mode.SUBTRACT)

    # 草图33 → 凸台-拉伸23 (add)
    with BuildSketch(Plane.ZY.offset(4.5)):
        Polygon((27.270895834, 8.757033666), (31.210126846, 8.062440955), (31.036478668, 7.077633202), (27.097247656, 7.772225913), align=None)
    extrude(amount=EXTRUDE_23_DEPTH)

    # 切除-拉伸10: up to this plane
    cut_extrude_10_end = Plane(origin=(1.537514073, 14, 22.437673566), z_dir=(0, 0.9563047559630374, -0.29237170472273044))
    # 草图35 → 切除-拉伸10 (cut, up to the surface)
    with BuildSketch(Plane(origin=(0, 3, 0), x_dir=(-1, 0, 0), z_dir=(0, -1, 0)), mode=Mode.PRIVATE) as cut_extrude_10_sk1:
        with Locations(Location((0, 0, 0), (0, 0, 90))):
            Circle(SKETCH_35_R)
    cut_extrude_10_tool1 = split(extrude(cut_extrude_10_sk1.sketch, amount=-CUT_EXTRUDE_10_REACH, mode=Mode.PRIVATE), bisect_by=cut_extrude_10_end, keep=Keep.BOTH, mode=Mode.PRIVATE)
    add(cut_extrude_10_tool1.solids().sort_by_distance((0, 3, 0))[0], mode=Mode.SUBTRACT)

    # 凸台-拉伸24: up to this plane
    extrude_24_end = Plane(origin=(43.5, 12.5, 22.661850068), z_dir=(0, 0.9563047559630374, -0.29237170472273066))
    # 草图36 → 凸台-拉伸24 (add, up to the surface)
    with BuildSketch(Plane.XZ, mode=Mode.PRIVATE) as extrude_24_sk1:
        with BuildLine():
            Line((-5.5, 0), (-3.5, 0))
            ThreePointArc((-3.5, 0), (0, 3.5), (3.5, 0))
            Line((3.5, 0), (5.5, 0))
            ThreePointArc((5.5, 0), (0, 5.5), (-5.5, 0))
        make_face()
    extrude_24_tool1 = split(extrude(extrude_24_sk1.sketch, amount=-EXTRUDE_24_REACH, mode=Mode.PRIVATE), bisect_by=extrude_24_end, keep=Keep.BOTH, mode=Mode.PRIVATE)
    add(extrude_24_tool1.solids().sort_by_distance((-4.5, 0, 0.122984))[0])

    # 凸台-拉伸25: up to this plane
    extrude_25_end = Plane(origin=(43.5, 12.5, 22.661850068), z_dir=(0, 0.9563047559630374, -0.29237170472273066))
    # 草图37 → 凸台-拉伸25 (add, up to the surface)
    with BuildSketch(Plane.XZ, mode=Mode.PRIVATE) as extrude_25_sk1:
        with BuildLine():
            Line((-7.5, 5.099019514), (-7.5, 0))
            Line((-7.5, 0), (-5.5, 0))
            ThreePointArc((-5.5, 0), (-5.120221349, 2.008316044), (-4.033333333, 3.739280977))
            ThreePointArc((-4.033333333, 3.739280977), (-6.230296743, 3.237120841), (-7.5, 5.099019514))
        make_face()
    extrude_25_tool1 = split(extrude(extrude_25_sk1.sketch, amount=-EXTRUDE_25_REACH, mode=Mode.PRIVATE), bisect_by=extrude_25_end, keep=Keep.BOTH, mode=Mode.PRIVATE)
    add(extrude_25_tool1.solids().sort_by_distance((-6.381558, 0, 1.877202))[0])
    # 草图37 → 凸台-拉伸25 (add, up to the surface)
    with BuildSketch(Plane.XZ, mode=Mode.PRIVATE) as extrude_25_sk2:
        with BuildLine():
            Line((-7.5, 8.798316647), (-7.5, 6.798316647))
            ThreePointArc((-7.5, 6.798316647), (-6.914213562, 8.21253021), (-5.5, 8.798316647))
            Line((-5.5, 8.798316647), (-7.5, 8.798316647))
        make_face()
    extrude_25_tool2 = split(extrude(extrude_25_sk2.sketch, amount=-EXTRUDE_25_REACH, mode=Mode.PRIVATE), bisect_by=extrude_25_end, keep=Keep.BOTH, mode=Mode.PRIVATE)
    add(extrude_25_tool2.solids().sort_by_distance((-7.053264, 0, 8.351581))[0])
    # 草图37 → 凸台-拉伸25 (add, up to the surface)
    with BuildSketch(Plane.XZ, mode=Mode.PRIVATE) as extrude_25_sk3:
        with BuildLine():
            ThreePointArc((7.228416147, 0), (6.017356006, 0.408355148), (5.300838508, 1.466666667))
            ThreePointArc((5.300838508, 1.466666667), (5.449982192, 0.74006358), (5.5, 0))
            Line((5.5, 0), (7.228416147, 0))
        make_face()
    extrude_25_tool3 = split(extrude(extrude_25_sk3.sketch, amount=-EXTRUDE_25_REACH, mode=Mode.PRIVATE), bisect_by=extrude_25_end, keep=Keep.BOTH, mode=Mode.PRIVATE)
    add(extrude_25_tool3.solids().sort_by_distance((5.871131, 0, 0.326096))[0])

    # 草图38 → 凸台-拉伸26 (add)
    with BuildSketch(Plane(origin=(52.5, 0, 0), x_dir=(0, 0, -1), z_dir=(1, 0, 0))):
        with Locations((-39.5, 4.5)):
            Rectangle(SKETCH_38_W, SKETCH_38_H)
    extrude(amount=EXTRUDE_26_DEPTH)

    # 草图39 → 凸台-拉伸27 (add)
    with BuildSketch(Plane(origin=(55.25, 0, 0), x_dir=(0, 0, -1), z_dir=(1, 0, 0))):
        with BuildLine():
            Line((-41.5, 14), (-46.208867521, 14))
            ThreePointArc((-46.208867521, 14), (-54.024933862, 11.705542723), (-49.3, 5.07))
            Line((-49.3, 5.07), (-41.5, -5))
            Line((-41.5, -5), (-41.5, 14))
        make_face()
        with Locations((-49.3, 10.07)):
            Circle(SKETCH_39_R, mode=Mode.SUBTRACT)
    extrude(amount=-EXTRUDE_27_DEPTH)

    # 草图40 → 凸台-拉伸28 (add)
    with BuildSketch(Plane.XY.offset(41.5)):
        with Locations((48, 11.5)):
            Rectangle(SKETCH_40_W, SKETCH_40_H)
    extrude(amount=EXTRUDE_28_DEPTH)

    # 倒角3
    chamfer_3_edges = [part.edges().sort_by_distance(p)[0] for p in [
        (52.5, 4.5, 37.5),
    ]]
    chamfer(chamfer_3_edges, length=CHAMFER_3_SIZE - 0.0001)  # a hair under: the kernel refuses the full size

    # 切除-拉伸11: up to this plane
    cut_extrude_11_end = Plane(origin=(1.537514073, 14, 22.437673566), z_dir=(0, 0.9563047559630374, -0.29237170472273044))
    # 草图41 → 切除-拉伸11 (cut, up to the surface)
    with BuildSketch(Plane(origin=(0, 3, 0), x_dir=(1, 0, 0), z_dir=(0, 1, 0)), mode=Mode.PRIVATE) as cut_extrude_11_sk1:
        with Locations((0, 3.5)):
            Rectangle(SKETCH_41_W, SKETCH_41_H)
    cut_extrude_11_tool1 = split(extrude(cut_extrude_11_sk1.sketch, amount=CUT_EXTRUDE_11_REACH, mode=Mode.PRIVATE), bisect_by=cut_extrude_11_end, keep=Keep.BOTH, mode=Mode.PRIVATE)
    add(cut_extrude_11_tool1.solids().sort_by_distance((0, 3, -3.5))[0], mode=Mode.SUBTRACT)

    # 圆角2
    fillet_2_edges = [part.edges().sort_by_distance(p)[0] for p in [
        (45.5, 7.403874271, 0.862718454),
        (14, 7.403874271, 0.862718454),
    ]]
    fillet(fillet_2_edges, radius=FILLET_2_R)

    # 草图42 → 凸台-拉伸29 (add)
    with BuildSketch(Plane.XZ.offset(5).offset(EXTRUDE_START_2)):
        Polygon((49.5, 38), (51.5, 36), (51.5, 38), align=None)
    extrude(amount=EXTRUDE_29_DEPTH)

    # 草图43 → 凸台-拉伸30 (add)
    with BuildSketch(Plane(origin=(55.25, 0, 0), x_dir=(0, 0, -1), z_dir=(1, 0, 0))):
        with Locations((-39, 4.5)):
            Rectangle(SKETCH_43_W, SKETCH_43_H)
    extrude(amount=EXTRUDE_30_DEPTH)

    # 倒角4
    chamfer_4_edges = [part.edges().sort_by_distance(p)[0] for p in [
        (56.75, 4.5, 37.5),
    ]]
    chamfer(chamfer_4_edges, length=CHAMFER_4_SIZE)

    # 草图45 → 凸台-拉伸31 (add)
    with BuildSketch(Plane.ZY.offset(9.5)):
        Polygon((0, 3.765711135), (21.356409098, 0), (0, 0), align=None)
    extrude(amount=EXTRUDE_31_DEPTH)

    # 圆角3
    # the kernel refuses this fillet: 2 mm, written as the material it takes off along each edge
    with BuildSketch(Plane(origin=(0.199805375, 5, -7), x_dir=(0, 0.29237170472273, 0.9563047559630375), z_dir=(-1, 0, 0))) as fillet_3_piece_1:
        with BuildLine():
            CenterArc((FILLET_3_R * 0.739961075028, -FILLET_3_R), FILLET_3_R, 90, 73)
            Line((-FILLET_3_R * 0.216343680935, -FILLET_3_R * 0.707628295277), (0, 0))
            Line((0, 0), (FILLET_3_R * 0.739961075028, 0))
        make_face()
    extrude(amount=13.39961075, mode=Mode.SUBTRACT)
    with BuildSketch(Plane(origin=(56.199805375, 5, -7), x_dir=(0, 0.29237170472273, 0.9563047559630375), z_dir=(-1, 0, 0))) as fillet_3_piece_2:
        with BuildLine():
            CenterArc((FILLET_3_R * 0.739961075028, -FILLET_3_R), FILLET_3_R, 90, 73)
            Line((-FILLET_3_R * 0.216343680935, -FILLET_3_R * 0.707628295277), (0, 0))
            Line((0, 0), (FILLET_3_R * 0.739961075028, 0))
        make_face()
    extrude(amount=56.39961075, mode=Mode.SUBTRACT)

    # 草图46 → 切除-拉伸12 (cut)
    with BuildSketch(Plane.XY.offset(41.5)):
        Polygon((53.25, 9), (42.75, 9), (42.75, 5.5), (49.5, 5.5), (49.5, -5), (53.25, -5), align=None)
    extrude(amount=-CUT_EXTRUDE_12_DEPTH, mode=Mode.SUBTRACT)

    # 草图47 → 凸台-拉伸32 (add, two sides: drawn at the far end of the back side and taken through both)
    with BuildSketch(Plane.XZ.offset(5).offset(-EXTRUDE_32_DEPTH_BACK)):
        with Locations((53.6, 14.975)):
            Rectangle(SKETCH_47_W, SKETCH_47_H)
    extrude(amount=EXTRUDE_32_DEPTH + EXTRUDE_32_DEPTH_BACK)

    # 倒角5
    chamfer_5_edges = [part.edges().sort_by_distance(p)[0] for p in [
        (54.7, -2, 14.975),
    ]]
    chamfer(chamfer_5_edges, length=CHAMFER_5_SIZE)

    # 草图48 → 切除-拉伸13 (cut)
    with BuildSketch(Plane.XZ.offset(8)):
        with Locations((53.05, 15.725)):
            Rectangle(SKETCH_48_W, SKETCH_48_H)
    extrude(amount=-CUT_EXTRUDE_13_DEPTH, mode=Mode.SUBTRACT)

    # 草图49 → 凸台-拉伸33 (add)
    with BuildSketch(Plane.XZ.offset(5)):
        Polygon((53.6, 36.95), (55.65, 39), (55.65, 40.5), (56.75, 40.5), (56.75, 39), (54.7, 36.95), align=None)
    extrude(amount=EXTRUDE_33_DEPTH)

    # 草图50 → 切除-拉伸14 (cut)
    with BuildSketch(Plane.XZ.offset(8)):
        with Locations((55.95, 39.5)):
            Rectangle(SKETCH_50_W, SKETCH_50_H)
    extrude(amount=-CUT_EXTRUDE_14_DEPTH, mode=Mode.SUBTRACT)

    # 草图51 → 凸台-拉伸34 (add)
    with BuildSketch(Plane.XZ.offset(5)):
        Polygon((55.15, 38.5), (53.6, 36.95), (53.6, 38.5), align=None)
    extrude(amount=EXTRUDE_34_DEPTH)


solid = part.part
